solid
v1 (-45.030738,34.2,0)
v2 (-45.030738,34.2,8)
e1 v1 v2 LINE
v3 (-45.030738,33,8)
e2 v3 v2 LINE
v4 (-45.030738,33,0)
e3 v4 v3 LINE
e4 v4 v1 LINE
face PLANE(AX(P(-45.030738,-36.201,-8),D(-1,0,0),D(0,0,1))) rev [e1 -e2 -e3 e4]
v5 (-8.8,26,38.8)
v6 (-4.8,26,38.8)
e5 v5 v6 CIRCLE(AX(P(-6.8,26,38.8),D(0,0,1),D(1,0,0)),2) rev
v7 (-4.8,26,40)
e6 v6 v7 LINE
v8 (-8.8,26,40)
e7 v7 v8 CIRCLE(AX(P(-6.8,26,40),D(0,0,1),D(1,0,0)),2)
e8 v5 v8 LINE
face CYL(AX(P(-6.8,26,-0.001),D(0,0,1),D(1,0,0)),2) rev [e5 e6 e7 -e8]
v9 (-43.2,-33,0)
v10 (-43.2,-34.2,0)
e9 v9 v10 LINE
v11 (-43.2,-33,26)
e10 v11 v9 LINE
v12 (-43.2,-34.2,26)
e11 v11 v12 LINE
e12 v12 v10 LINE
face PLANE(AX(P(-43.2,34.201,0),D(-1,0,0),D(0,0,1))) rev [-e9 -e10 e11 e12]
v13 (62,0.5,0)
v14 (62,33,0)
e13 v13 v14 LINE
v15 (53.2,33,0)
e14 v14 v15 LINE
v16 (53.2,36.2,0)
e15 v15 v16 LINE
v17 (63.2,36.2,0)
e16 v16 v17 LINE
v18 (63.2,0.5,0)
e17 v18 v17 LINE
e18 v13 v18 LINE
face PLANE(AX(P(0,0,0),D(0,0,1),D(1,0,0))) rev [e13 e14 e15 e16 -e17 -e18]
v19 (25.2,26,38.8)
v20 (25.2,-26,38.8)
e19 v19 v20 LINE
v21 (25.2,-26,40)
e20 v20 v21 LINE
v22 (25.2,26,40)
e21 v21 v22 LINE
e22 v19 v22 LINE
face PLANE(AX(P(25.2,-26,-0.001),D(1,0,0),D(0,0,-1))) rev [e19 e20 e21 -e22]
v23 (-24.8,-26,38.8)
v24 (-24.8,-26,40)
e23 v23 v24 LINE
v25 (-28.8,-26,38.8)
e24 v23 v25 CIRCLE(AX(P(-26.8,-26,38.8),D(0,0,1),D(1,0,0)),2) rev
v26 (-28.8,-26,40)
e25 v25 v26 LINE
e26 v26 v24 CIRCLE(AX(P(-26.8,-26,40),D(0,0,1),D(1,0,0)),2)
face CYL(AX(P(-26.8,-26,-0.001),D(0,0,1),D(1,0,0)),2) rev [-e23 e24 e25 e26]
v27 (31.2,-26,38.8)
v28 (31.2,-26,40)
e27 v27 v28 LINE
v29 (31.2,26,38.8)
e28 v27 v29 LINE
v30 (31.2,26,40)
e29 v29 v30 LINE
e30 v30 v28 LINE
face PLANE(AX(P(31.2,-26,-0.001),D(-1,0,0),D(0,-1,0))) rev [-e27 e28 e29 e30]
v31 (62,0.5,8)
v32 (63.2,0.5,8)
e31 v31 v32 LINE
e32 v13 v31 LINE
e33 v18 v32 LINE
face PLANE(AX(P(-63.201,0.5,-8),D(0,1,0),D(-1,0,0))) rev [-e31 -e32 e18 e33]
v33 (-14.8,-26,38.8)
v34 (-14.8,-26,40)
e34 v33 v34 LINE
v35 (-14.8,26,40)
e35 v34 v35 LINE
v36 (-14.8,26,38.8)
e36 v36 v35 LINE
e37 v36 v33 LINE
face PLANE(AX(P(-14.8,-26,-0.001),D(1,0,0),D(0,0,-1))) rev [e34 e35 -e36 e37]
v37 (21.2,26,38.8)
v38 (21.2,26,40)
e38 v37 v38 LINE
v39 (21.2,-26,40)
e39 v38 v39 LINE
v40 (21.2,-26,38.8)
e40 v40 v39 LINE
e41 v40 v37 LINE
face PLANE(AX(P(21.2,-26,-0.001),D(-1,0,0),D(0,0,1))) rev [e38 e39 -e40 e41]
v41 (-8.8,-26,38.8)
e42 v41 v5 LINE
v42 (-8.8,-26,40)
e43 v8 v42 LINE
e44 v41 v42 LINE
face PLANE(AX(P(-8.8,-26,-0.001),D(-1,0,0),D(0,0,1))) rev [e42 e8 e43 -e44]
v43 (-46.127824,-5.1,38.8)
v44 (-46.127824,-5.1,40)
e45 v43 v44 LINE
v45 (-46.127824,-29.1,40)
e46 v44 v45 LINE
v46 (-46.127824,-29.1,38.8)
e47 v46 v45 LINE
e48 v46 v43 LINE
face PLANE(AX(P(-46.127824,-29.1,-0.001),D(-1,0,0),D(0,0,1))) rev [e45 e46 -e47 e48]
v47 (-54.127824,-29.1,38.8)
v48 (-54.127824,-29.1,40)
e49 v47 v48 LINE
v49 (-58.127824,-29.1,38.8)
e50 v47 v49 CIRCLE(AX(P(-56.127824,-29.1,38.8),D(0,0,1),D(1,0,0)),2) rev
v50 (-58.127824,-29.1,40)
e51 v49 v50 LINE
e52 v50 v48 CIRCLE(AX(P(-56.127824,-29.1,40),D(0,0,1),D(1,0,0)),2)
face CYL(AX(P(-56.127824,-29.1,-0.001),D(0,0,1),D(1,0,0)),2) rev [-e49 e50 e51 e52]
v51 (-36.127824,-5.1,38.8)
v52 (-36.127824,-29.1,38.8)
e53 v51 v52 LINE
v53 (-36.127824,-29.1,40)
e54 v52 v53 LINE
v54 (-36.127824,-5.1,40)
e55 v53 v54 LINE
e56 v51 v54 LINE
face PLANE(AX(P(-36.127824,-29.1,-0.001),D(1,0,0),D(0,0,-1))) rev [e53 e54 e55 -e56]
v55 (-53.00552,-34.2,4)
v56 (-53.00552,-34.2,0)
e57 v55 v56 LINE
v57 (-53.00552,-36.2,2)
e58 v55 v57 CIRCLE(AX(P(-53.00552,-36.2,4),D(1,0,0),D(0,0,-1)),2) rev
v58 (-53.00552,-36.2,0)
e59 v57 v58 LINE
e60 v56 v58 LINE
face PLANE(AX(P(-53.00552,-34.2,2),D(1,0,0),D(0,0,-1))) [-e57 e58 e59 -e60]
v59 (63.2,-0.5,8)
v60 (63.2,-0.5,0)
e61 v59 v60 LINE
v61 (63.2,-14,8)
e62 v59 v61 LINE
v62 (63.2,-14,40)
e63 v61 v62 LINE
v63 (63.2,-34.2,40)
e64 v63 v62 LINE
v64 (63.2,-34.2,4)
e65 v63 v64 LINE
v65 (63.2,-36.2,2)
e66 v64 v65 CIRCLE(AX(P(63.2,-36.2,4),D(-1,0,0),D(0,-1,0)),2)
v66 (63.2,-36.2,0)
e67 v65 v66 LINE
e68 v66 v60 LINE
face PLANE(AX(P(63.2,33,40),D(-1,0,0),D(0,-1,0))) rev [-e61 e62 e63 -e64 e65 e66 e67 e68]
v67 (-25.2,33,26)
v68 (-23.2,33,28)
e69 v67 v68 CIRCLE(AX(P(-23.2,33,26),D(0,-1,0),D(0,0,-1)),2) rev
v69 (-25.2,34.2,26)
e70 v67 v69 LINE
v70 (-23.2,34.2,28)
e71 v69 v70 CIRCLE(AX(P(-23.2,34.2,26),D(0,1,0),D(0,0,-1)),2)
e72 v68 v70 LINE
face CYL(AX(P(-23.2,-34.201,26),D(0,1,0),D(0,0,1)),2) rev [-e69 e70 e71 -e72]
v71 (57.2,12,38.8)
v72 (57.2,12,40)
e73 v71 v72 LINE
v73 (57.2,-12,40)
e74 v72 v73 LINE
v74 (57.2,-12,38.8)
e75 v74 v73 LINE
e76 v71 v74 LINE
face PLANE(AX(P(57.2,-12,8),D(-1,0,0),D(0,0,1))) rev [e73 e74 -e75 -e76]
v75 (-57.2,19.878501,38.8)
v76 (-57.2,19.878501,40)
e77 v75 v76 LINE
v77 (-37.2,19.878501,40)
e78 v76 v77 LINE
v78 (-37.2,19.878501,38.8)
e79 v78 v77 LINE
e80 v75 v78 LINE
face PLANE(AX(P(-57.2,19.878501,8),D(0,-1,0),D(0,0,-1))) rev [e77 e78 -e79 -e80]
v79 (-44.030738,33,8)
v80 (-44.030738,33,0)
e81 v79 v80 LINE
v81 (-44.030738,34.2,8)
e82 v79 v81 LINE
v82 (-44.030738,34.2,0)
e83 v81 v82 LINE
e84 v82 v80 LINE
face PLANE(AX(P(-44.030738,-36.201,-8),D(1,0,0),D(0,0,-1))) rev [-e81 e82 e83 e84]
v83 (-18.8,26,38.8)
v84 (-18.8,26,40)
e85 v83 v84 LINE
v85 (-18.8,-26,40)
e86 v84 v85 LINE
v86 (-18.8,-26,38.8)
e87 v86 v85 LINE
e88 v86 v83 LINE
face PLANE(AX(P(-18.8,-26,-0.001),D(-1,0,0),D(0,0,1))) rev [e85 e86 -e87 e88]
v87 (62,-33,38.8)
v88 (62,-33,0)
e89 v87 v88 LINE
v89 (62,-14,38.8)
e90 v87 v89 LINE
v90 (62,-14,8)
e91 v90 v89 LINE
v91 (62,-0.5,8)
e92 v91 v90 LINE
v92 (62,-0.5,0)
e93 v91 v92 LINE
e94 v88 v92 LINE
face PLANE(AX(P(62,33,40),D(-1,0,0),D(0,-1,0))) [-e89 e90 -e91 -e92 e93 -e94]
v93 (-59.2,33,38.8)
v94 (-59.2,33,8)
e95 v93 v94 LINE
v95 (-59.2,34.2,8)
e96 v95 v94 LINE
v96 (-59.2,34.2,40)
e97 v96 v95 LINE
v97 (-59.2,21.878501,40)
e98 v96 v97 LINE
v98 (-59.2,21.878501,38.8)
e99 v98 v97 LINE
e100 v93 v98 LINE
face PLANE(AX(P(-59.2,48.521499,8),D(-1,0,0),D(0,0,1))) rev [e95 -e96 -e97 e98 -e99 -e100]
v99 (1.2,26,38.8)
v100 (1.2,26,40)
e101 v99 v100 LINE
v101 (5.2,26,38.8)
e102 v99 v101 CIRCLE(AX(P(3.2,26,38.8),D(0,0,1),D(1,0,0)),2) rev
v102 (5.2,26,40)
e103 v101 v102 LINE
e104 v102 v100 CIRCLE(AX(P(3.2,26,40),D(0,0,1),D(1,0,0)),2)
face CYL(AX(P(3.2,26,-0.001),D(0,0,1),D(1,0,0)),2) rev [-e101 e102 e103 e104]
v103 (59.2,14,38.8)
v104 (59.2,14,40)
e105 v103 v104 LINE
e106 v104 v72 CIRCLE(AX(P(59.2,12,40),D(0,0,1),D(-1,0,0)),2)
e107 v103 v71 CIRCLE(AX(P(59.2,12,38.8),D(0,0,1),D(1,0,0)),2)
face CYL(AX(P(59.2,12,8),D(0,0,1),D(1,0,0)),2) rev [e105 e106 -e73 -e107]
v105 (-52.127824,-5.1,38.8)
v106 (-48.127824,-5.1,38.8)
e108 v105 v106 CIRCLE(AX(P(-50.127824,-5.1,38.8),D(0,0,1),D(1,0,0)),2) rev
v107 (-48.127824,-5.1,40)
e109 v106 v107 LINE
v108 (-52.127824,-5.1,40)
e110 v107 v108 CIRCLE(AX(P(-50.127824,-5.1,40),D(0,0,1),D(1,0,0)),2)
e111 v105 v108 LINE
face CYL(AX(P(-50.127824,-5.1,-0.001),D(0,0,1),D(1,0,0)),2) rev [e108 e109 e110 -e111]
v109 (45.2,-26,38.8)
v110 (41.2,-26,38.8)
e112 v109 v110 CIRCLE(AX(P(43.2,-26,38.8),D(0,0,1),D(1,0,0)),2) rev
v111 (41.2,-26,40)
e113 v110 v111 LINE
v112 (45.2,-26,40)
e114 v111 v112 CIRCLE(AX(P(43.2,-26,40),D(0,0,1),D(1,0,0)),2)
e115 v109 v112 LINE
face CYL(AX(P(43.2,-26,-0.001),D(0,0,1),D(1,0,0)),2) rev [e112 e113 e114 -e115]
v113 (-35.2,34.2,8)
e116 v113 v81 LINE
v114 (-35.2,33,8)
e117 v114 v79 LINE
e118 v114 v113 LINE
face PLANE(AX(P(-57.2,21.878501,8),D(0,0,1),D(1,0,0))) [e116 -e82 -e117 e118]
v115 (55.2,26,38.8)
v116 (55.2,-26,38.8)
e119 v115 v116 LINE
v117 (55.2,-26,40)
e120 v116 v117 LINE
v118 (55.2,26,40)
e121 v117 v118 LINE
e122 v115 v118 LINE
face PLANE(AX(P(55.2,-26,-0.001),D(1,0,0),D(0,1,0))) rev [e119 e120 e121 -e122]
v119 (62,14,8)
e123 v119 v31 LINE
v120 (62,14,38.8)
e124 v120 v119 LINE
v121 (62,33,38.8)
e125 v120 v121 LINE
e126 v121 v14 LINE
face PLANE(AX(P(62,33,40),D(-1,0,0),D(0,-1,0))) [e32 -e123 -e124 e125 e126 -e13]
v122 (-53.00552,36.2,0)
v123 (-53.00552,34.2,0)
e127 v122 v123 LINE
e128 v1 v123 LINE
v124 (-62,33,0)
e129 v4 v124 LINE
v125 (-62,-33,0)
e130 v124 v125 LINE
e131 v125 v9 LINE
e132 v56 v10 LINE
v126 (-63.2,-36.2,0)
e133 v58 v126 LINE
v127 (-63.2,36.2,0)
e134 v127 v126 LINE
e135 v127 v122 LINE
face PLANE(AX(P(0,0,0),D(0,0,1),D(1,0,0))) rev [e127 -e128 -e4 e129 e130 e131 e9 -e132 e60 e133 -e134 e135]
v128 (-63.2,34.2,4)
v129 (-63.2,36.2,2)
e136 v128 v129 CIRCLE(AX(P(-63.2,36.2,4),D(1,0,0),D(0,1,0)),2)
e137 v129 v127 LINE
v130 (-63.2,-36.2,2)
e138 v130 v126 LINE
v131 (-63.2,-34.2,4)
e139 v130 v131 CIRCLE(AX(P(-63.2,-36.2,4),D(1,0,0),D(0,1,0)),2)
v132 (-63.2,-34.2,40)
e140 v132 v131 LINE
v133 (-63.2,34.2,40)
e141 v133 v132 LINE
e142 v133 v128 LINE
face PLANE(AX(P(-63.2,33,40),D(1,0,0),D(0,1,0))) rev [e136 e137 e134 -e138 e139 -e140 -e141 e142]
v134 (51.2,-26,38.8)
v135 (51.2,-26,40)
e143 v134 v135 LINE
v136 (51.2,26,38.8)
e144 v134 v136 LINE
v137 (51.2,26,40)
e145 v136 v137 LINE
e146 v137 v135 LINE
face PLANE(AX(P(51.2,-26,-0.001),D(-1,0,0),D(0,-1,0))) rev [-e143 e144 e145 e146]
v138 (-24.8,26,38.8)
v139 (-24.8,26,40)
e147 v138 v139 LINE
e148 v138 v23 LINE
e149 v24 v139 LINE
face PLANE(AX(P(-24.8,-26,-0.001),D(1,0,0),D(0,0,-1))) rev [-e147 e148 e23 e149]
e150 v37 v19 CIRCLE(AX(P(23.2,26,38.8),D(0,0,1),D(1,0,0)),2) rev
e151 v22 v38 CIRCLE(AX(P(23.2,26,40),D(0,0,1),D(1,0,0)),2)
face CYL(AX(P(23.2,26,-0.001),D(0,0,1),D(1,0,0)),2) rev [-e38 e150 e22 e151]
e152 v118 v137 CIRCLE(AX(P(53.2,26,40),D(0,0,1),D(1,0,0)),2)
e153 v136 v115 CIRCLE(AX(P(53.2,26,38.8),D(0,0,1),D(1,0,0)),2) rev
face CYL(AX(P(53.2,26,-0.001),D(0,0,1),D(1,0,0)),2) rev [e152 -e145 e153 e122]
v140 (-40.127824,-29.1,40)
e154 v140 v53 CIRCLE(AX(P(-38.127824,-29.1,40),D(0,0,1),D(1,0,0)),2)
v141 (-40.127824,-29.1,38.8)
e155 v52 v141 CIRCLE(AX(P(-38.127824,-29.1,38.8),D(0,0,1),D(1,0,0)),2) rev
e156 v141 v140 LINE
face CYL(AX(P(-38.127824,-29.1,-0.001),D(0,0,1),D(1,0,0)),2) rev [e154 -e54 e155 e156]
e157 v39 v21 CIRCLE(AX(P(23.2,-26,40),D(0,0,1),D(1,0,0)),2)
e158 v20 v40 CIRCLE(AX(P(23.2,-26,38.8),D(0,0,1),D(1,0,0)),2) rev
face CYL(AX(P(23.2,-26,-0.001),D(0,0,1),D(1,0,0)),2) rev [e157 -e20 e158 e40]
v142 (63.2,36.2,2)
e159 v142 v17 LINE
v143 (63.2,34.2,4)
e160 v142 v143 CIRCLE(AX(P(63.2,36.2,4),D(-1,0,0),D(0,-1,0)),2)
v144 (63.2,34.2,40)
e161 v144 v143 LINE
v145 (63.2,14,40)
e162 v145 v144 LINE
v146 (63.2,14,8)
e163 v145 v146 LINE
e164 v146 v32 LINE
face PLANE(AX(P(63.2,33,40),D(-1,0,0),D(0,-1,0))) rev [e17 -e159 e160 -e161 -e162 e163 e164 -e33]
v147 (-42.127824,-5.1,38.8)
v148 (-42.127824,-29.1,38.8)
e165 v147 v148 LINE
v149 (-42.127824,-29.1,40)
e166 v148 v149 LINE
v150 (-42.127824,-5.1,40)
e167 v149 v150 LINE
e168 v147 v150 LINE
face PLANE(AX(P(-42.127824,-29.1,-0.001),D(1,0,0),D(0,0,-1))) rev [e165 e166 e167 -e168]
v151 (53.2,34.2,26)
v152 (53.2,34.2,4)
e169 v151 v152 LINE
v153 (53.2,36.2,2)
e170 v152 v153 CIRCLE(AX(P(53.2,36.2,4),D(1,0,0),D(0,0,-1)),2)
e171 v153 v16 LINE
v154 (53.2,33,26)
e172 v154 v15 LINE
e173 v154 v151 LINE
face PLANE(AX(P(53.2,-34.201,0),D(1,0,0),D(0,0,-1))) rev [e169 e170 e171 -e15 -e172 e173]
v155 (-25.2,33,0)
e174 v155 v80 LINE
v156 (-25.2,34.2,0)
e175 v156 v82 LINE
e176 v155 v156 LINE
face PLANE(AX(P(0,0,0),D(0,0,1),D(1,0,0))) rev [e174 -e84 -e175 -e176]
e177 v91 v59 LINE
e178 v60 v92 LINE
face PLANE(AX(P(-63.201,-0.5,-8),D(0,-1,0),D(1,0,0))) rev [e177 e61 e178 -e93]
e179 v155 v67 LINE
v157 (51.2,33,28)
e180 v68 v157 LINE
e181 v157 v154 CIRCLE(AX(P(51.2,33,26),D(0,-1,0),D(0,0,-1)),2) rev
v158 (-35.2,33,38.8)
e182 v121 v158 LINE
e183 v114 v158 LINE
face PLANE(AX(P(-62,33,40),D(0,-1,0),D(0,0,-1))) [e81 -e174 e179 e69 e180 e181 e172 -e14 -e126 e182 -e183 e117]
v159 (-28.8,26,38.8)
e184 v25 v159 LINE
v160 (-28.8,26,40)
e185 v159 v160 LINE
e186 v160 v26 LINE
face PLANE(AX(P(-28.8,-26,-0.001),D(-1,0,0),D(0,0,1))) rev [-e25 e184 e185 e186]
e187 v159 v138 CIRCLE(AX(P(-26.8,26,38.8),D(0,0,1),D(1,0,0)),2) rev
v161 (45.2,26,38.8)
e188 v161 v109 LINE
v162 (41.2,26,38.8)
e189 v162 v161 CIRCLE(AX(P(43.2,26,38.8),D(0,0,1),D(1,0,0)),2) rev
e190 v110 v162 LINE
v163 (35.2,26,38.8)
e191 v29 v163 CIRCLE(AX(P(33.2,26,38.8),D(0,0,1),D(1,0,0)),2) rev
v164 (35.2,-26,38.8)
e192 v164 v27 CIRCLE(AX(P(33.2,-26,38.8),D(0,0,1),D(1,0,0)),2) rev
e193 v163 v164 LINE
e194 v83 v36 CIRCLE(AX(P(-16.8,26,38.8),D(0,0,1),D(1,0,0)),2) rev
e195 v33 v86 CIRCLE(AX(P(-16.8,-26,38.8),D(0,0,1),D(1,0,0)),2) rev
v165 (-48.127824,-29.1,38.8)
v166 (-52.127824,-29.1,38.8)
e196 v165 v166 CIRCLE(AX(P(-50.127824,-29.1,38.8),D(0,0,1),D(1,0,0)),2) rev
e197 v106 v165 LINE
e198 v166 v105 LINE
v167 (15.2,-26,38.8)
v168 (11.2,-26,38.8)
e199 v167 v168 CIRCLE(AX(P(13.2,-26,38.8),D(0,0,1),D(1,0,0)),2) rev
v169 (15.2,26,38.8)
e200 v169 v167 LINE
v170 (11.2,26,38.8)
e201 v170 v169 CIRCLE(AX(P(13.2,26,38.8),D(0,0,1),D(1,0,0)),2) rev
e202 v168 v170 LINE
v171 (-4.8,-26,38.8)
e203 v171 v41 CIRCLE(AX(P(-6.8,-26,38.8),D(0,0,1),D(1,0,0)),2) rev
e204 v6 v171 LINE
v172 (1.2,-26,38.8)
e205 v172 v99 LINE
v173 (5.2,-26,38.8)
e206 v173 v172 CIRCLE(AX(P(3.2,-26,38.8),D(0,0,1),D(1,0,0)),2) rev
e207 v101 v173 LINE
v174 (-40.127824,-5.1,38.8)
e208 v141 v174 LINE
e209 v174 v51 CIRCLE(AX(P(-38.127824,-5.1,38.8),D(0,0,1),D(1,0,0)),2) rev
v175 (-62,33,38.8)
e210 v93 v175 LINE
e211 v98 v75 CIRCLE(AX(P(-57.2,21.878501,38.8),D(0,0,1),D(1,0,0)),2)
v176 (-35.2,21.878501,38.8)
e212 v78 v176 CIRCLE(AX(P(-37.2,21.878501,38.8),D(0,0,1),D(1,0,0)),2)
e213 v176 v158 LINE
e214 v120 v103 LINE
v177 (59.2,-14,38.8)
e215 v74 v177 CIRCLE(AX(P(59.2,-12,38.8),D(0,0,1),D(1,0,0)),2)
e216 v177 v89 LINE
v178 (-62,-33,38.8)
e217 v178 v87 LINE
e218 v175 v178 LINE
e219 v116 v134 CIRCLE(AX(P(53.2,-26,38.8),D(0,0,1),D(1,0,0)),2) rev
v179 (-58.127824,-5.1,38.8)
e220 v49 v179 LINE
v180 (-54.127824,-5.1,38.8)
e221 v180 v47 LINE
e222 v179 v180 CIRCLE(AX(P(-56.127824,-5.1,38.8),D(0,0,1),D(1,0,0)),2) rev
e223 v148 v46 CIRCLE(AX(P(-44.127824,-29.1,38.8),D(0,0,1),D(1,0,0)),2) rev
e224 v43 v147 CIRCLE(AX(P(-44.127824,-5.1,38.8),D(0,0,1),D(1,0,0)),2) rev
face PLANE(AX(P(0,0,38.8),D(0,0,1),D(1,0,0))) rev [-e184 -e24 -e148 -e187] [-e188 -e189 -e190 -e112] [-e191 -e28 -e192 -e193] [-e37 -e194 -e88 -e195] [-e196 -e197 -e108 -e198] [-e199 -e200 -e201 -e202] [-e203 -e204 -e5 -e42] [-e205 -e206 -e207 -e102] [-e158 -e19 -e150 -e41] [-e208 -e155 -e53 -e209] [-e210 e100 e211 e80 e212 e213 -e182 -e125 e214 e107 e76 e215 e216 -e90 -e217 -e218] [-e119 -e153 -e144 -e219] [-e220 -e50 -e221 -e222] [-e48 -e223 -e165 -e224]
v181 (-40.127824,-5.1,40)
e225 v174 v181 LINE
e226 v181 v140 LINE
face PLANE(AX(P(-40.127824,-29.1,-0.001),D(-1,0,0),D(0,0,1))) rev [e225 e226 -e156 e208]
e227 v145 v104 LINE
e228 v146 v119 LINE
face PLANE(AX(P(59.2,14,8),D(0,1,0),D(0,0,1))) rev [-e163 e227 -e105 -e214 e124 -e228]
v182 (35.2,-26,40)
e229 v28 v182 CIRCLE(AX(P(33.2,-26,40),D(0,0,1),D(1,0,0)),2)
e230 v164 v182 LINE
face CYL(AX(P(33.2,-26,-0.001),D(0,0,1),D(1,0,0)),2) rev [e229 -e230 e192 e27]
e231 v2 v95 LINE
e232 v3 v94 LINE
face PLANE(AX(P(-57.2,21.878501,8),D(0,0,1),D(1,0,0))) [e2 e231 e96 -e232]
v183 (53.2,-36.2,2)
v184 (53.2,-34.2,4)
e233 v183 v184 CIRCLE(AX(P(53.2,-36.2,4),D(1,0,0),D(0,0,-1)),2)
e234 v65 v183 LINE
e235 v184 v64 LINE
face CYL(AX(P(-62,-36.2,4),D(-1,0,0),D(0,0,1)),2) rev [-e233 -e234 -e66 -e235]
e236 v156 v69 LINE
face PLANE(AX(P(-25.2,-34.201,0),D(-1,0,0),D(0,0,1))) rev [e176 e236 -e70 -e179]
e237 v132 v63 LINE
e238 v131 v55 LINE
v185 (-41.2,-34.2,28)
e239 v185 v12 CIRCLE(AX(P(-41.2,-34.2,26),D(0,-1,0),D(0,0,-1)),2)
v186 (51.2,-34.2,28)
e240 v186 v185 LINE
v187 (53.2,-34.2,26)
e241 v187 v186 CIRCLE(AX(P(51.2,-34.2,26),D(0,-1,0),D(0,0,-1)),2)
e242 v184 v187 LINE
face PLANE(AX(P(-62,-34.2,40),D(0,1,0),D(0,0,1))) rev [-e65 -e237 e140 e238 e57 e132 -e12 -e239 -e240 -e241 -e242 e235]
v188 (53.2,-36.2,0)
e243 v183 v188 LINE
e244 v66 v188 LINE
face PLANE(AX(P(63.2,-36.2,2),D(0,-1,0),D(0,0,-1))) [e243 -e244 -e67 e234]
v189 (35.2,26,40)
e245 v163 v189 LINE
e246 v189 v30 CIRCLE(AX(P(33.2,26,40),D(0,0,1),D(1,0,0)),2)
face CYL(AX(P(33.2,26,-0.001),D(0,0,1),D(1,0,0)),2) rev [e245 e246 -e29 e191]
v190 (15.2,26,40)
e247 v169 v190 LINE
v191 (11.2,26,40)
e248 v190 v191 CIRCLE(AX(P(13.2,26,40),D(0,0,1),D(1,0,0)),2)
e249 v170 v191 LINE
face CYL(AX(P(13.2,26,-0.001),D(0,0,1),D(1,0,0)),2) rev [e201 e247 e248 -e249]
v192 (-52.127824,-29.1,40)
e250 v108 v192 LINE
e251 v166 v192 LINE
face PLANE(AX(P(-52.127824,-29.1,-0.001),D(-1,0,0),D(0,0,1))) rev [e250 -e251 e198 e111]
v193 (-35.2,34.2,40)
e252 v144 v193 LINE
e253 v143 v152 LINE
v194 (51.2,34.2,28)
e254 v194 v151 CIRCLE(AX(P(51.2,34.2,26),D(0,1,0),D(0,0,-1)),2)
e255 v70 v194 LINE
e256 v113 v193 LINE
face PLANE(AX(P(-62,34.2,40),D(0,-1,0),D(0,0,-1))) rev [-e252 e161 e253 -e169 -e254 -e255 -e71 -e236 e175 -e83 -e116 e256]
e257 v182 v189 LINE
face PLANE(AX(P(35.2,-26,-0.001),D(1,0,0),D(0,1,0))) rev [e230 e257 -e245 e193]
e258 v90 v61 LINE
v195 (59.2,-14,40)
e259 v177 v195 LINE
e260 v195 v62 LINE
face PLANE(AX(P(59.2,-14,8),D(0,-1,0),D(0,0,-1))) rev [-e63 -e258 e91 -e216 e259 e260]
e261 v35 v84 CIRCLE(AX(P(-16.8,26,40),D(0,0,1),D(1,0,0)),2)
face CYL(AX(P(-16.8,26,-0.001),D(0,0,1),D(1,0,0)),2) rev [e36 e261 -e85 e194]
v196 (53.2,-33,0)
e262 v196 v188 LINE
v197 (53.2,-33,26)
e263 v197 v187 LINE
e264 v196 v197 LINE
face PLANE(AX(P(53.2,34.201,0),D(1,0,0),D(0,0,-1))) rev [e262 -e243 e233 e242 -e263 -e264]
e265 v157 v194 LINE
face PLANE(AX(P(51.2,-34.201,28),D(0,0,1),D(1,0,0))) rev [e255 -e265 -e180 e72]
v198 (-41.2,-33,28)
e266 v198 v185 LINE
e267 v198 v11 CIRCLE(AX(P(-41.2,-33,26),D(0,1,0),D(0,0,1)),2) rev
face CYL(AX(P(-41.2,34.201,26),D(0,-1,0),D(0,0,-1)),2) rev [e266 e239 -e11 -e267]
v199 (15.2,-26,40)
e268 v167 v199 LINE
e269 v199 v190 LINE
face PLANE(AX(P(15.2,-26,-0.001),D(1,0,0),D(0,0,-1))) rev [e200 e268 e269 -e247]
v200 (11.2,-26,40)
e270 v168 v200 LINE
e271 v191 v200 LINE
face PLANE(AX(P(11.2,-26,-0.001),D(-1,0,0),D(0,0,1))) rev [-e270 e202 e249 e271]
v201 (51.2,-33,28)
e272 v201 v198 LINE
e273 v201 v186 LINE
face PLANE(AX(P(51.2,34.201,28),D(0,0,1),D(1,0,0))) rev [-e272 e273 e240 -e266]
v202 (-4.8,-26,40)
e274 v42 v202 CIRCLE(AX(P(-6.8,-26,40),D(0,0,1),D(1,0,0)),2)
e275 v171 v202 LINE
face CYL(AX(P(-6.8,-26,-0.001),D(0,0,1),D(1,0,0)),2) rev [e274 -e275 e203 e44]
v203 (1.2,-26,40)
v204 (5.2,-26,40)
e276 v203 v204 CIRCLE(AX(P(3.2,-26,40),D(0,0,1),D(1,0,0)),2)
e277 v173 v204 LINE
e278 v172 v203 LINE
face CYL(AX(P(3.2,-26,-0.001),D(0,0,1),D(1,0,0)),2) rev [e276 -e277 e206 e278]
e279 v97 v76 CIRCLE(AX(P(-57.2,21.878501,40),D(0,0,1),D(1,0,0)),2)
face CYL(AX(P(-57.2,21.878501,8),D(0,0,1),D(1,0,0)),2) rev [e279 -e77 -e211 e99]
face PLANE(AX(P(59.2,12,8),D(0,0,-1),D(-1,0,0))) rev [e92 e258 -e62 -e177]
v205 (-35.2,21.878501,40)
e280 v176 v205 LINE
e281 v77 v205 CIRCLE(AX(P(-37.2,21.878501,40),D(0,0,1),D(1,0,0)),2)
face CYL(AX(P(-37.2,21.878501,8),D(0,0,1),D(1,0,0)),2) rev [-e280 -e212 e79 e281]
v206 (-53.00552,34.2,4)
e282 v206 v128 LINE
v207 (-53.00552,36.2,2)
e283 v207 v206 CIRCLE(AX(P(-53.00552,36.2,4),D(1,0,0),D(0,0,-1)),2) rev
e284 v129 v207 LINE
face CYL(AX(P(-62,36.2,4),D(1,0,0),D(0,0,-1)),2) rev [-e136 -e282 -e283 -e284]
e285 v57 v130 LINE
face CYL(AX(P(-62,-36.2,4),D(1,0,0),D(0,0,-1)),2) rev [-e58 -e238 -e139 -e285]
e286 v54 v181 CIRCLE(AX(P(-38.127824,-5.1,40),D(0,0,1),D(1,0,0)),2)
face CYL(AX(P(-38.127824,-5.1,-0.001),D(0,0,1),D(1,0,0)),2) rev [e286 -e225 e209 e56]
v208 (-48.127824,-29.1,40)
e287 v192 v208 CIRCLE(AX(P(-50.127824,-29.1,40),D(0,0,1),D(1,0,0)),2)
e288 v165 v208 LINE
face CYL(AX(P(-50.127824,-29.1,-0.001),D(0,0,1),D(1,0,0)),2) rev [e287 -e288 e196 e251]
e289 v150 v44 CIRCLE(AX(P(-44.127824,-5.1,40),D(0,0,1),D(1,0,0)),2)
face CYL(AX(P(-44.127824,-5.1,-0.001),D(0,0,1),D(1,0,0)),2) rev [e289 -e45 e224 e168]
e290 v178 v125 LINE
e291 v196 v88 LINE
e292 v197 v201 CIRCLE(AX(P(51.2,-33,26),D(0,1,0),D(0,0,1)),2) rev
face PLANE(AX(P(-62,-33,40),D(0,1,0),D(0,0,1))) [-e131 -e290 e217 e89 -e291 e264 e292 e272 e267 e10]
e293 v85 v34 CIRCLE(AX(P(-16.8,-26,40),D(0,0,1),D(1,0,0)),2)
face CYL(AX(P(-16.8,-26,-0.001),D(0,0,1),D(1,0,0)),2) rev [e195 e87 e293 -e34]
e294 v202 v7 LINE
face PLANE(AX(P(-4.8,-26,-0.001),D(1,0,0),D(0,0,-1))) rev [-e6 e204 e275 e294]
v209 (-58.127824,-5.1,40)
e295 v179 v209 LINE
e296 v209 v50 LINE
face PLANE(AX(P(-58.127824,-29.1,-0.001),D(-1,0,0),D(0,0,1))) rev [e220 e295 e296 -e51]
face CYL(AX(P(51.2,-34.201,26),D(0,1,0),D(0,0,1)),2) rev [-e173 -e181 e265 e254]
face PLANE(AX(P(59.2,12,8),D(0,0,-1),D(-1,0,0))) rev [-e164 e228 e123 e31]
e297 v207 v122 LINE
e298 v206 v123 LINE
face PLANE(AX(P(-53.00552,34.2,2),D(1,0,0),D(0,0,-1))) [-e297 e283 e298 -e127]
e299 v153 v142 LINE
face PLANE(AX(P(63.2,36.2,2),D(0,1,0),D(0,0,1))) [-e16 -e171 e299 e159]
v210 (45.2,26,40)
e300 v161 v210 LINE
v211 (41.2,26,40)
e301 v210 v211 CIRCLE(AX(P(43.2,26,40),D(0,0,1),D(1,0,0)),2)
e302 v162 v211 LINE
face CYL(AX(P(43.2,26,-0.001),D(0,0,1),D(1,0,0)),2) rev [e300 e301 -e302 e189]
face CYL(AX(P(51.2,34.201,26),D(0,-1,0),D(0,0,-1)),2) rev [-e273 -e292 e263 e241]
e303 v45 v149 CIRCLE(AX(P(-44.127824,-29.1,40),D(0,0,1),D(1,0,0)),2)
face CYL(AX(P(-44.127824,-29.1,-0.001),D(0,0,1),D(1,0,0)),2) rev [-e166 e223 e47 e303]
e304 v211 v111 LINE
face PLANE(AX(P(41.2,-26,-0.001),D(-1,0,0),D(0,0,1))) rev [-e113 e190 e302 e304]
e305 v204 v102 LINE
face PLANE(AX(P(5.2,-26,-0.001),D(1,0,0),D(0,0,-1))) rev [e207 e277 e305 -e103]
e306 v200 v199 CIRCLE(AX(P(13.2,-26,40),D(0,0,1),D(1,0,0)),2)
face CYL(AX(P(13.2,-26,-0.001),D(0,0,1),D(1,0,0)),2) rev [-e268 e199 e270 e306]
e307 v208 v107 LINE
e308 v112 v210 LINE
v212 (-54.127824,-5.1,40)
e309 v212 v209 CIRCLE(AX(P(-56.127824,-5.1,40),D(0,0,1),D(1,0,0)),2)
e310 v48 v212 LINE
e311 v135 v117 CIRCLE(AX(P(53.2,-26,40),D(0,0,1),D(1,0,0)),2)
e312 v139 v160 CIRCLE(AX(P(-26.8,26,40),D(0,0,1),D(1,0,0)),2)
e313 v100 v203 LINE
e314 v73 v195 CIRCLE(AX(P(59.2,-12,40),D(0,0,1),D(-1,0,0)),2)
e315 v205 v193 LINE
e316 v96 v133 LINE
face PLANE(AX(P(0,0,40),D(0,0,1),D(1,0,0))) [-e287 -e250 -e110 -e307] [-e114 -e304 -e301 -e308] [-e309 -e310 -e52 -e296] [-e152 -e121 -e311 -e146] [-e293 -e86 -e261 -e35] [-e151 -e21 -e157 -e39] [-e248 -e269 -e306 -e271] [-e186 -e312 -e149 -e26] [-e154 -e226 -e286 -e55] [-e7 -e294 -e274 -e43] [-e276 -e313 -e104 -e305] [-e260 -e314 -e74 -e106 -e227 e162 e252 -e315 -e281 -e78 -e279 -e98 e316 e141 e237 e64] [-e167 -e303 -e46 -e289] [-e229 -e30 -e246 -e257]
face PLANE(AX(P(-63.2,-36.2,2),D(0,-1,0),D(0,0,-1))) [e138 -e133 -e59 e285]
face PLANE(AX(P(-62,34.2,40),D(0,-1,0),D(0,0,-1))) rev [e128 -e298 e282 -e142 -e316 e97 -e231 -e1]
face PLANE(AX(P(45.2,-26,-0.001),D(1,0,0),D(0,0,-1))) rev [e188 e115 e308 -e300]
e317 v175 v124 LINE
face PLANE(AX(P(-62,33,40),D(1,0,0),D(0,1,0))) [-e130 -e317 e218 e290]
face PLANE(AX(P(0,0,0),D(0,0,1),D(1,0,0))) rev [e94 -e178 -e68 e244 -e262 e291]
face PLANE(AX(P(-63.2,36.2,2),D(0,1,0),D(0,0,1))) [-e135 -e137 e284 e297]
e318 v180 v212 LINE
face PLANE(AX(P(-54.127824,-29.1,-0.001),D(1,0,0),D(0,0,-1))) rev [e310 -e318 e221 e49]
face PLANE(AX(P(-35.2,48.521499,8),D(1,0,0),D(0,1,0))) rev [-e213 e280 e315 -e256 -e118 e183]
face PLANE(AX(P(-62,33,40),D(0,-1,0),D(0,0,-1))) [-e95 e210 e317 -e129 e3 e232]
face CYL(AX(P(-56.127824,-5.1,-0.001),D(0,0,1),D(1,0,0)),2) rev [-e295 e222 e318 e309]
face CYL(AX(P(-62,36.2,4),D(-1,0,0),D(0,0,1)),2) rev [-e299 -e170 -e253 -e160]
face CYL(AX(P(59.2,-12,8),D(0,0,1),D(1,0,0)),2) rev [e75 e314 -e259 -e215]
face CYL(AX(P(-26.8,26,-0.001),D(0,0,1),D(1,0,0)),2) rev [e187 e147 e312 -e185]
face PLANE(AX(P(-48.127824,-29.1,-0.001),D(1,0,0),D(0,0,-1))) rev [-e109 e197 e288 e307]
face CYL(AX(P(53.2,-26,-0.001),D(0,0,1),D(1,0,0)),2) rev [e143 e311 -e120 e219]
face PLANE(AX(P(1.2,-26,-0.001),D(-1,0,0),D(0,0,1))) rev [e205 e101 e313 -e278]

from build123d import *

# Parameters (mm, degrees)
SKETCH_1_W          = 126.4
SKETCH_1_H          = 68.4
SKETCH_1_W_2        = 124
SKETCH_1_H_2        = 66
EXTRUDE_1_DEPTH     = 40
SKETCH_2_W          = 126.4
SKETCH_2_H          = 68.4
EXTRUDE_1_2_DEPTH   = 1.2
CUT_EXTRUDE_1_DEPTH = 32
CUT_EXTRUDE_2_REACH = 84.243
CUT_EXTRUDE_3_DEPTH = 32
CUT_EXTRUDE_4_REACH = 103.355
CUT_EXTRUDE_5_REACH = 103.355
SKETCH_8_W          = 10
SKETCH_8_H          = 2
SKETCH_8_W_2        = 10.194480457
EXTRUDE_2_DEPTH     = 2
FILLET_1_R          = 2
CUT_EXTRUDE_6_REACH = 139.431
SKETCH_9_W          = 16
SKETCH_9_H          = 1
CUT_EXTRUDE_7_REACH = 104.715
SKETCH_10_W         = 1
SKETCH_10_H         = 16


with BuildPart() as part:
    # Эскиз1 → Extrude 1 (new body)
    with BuildSketch(Plane.XY):
        Rectangle(SKETCH_1_W, SKETCH_1_H)
        Rectangle(SKETCH_1_W_2, SKETCH_1_H_2, mode=Mode.SUBTRACT)
    extrude(amount=EXTRUDE_1_DEPTH)

    # Эскиз2 → Extrude 1 2 (add)
    with BuildSketch(Plane.XY.offset(40)):
        Rectangle(SKETCH_2_W, SKETCH_2_H)
    extrude(amount=-EXTRUDE_1_2_DEPTH)

    # Эскиз3 → Вырез-Вытянуть1 (cut)
    with BuildSketch(Plane.XY.offset(40)):
        with BuildLine():
            Line((59.2, -14), (69.2, -14))
            Line((69.2, -14), (69.2, 14))
            Line((69.2, 14), (59.2, 14))
            ThreePointArc((59.2, 14), (57.785786438, 13.414213562), (57.2, 12))
            Line((57.2, 12), (57.2, -12))
            ThreePointArc((57.2, -12), (57.785786438, -13.414213562), (59.2, -14))
        make_face()
    extrude(amount=-CUT_EXTRUDE_1_DEPTH, mode=Mode.SUBTRACT)

    # Эскиз4 → Вырез-Вытянуть2 (cut, up to next)
    with BuildSketch(Plane.XY.offset(40), mode=Mode.PRIVATE) as cut_extrude_2_sk1:
        with BuildLine():
            Line((51.2, -26), (51.2, 26))
            ThreePointArc((51.2, 26), (53.2, 28), (55.2, 26))
            Line((55.2, 26), (55.2, -26))
            ThreePointArc((55.2, -26), (53.2, -28), (51.2, -26))
        make_face()
    cut_extrude_2_tool1 = extrude(cut_extrude_2_sk1.sketch, amount=-CUT_EXTRUDE_2_REACH, mode=Mode.PRIVATE) & part.part
    # Эскиз4 → Вырез-Вытянуть2 (cut, up to next)
    with BuildSketch(Plane.XY.offset(40), mode=Mode.PRIVATE) as cut_extrude_2_sk2:
        with BuildLine():
            Line((41.2, -26), (41.2, 26))
            ThreePointArc((41.2, 26), (43.2, 28), (45.2, 26))
            Line((45.2, 26), (45.2, -26))
            ThreePointArc((45.2, -26), (43.2, -28), (41.2, -26))
        make_face()
    cut_extrude_2_tool2 = extrude(cut_extrude_2_sk2.sketch, amount=-CUT_EXTRUDE_2_REACH, mode=Mode.PRIVATE) & part.part
    # Эскиз4 → Вырез-Вытянуть2 (cut, up to next)
    with BuildSketch(Plane.XY.offset(40), mode=Mode.PRIVATE) as cut_extrude_2_sk3:
        with BuildLine():
            Line((31.2, -26), (31.2, 26))
            ThreePointArc((31.2, 26), (33.2, 28), (35.2, 26))
            Line((35.2, 26), (35.2, -26))
            ThreePointArc((35.2, -26), (33.2, -28), (31.2, -26))
        make_face()
    cut_extrude_2_tool3 = extrude(cut_extrude_2_sk3.sketch, amount=-CUT_EXTRUDE_2_REACH, mode=Mode.PRIVATE) & part.part
    # Эскиз4 → Вырез-Вытянуть2 (cut, up to next)
    with BuildSketch(Plane.XY.offset(40), mode=Mode.PRIVATE) as cut_extrude_2_sk4:
        with BuildLine():
            Line((21.2, -26), (21.2, 26))
            ThreePointArc((21.2, 26), (23.2, 28), (25.2, 26))
            Line((25.2, 26), (25.2, -26))
            ThreePointArc((25.2, -26), (23.2, -28), (21.2, -26))
        make_face()
    cut_extrude_2_tool4 = extrude(cut_extrude_2_sk4.sketch, amount=-CUT_EXTRUDE_2_REACH, mode=Mode.PRIVATE) & part.part
    # Эскиз4 → Вырез-Вытянуть2 (cut, up to next)
    with BuildSketch(Plane.XY.offset(40), mode=Mode.PRIVATE) as cut_extrude_2_sk5:
        with BuildLine():
            Line((11.2, -26), (11.2, 26))
            ThreePointArc((11.2, 26), (13.2, 28), (15.2, 26))
            Line((15.2, 26), (15.2, -26))
            ThreePointArc((15.2, -26), (13.2, -28), (11.2, -26))
        make_face()
    cut_extrude_2_tool5 = extrude(cut_extrude_2_sk5.sketch, amount=-CUT_EXTRUDE_2_REACH, mode=Mode.PRIVATE) & part.part
    # Эскиз4 → Вырез-Вытянуть2 (cut, up to next)
    with BuildSketch(Plane.XY.offset(40), mode=Mode.PRIVATE) as cut_extrude_2_sk6:
        with BuildLine():
            Line((1.2, -26), (1.2, 26))
            ThreePointArc((1.2, 26), (3.2, 28), (5.2, 26))
            Line((5.2, 26), (5.2, -26))
            ThreePointArc((5.2, -26), (3.2, -28), (1.2, -26))
        make_face()
    cut_extrude_2_tool6 = extrude(cut_extrude_2_sk6.sketch, amount=-CUT_EXTRUDE_2_REACH, mode=Mode.PRIVATE) & part.part
    # Эскиз4 → Вырез-Вытянуть2 (cut, up to next)
    with BuildSketch(Plane.XY.offset(40), mode=Mode.PRIVATE) as cut_extrude_2_sk7:
        with BuildLine():
            Line((-8.8, -26), (-8.8, 26))
            ThreePointArc((-8.8, 26), (-6.8, 28), (-4.8, 26))
            Line((-4.8, 26), (-4.8, -26))
            ThreePointArc((-4.8, -26), (-6.8, -28), (-8.8, -26))
        make_face()
    cut_extrude_2_tool7 = extrude(cut_extrude_2_sk7.sketch, amount=-CUT_EXTRUDE_2_REACH, mode=Mode.PRIVATE) & part.part
    # Эскиз4 → Вырез-Вытянуть2 (cut, up to next)
    with BuildSketch(Plane.XY.offset(40), mode=Mode.PRIVATE) as cut_extrude_2_sk8:
        with BuildLine():
            Line((-18.8, -26), (-18.8, 26))
            ThreePointArc((-18.8, 26), (-16.8, 28), (-14.8, 26))
            Line((-14.8, 26), (-14.8, -26))
            ThreePointArc((-14.8, -26), (-16.8, -28), (-18.8, -26))
        make_face()
    cut_extrude_2_tool8 = extrude(cut_extrude_2_sk8.sketch, amount=-CUT_EXTRUDE_2_REACH, mode=Mode.PRIVATE) & part.part
    # Эскиз4 → Вырез-Вытянуть2 (cut, up to next)
    with BuildSketch(Plane.XY.offset(40), mode=Mode.PRIVATE) as cut_extrude_2_sk9:
        with BuildLine():
            Line((-28.8, -26), (-28.8, 26))
            ThreePointArc((-28.8, 26), (-26.8, 28), (-24.8, 26))
            Line((-24.8, 26), (-24.8, -26))
            ThreePointArc((-24.8, -26), (-26.8, -28), (-28.8, -26))
        make_face()
    cut_extrude_2_tool9 = extrude(cut_extrude_2_sk9.sketch, amount=-CUT_EXTRUDE_2_REACH, mode=Mode.PRIVATE) & part.part
    # Эскиз4 → Вырез-Вытянуть2 (cut, up to next)
    with BuildSketch(Plane.XY.offset(40), mode=Mode.PRIVATE) as cut_extrude_2_sk10:
        with BuildLine():
            Line((-40.127823637, -29.1), (-40.127823637, -5.1))
            ThreePointArc((-40.127823637, -5.1), (-38.127823637, -3.1), (-36.127823637, -5.1))
            Line((-36.127823637, -5.1), (-36.127823637, -29.1))
            ThreePointArc((-36.127823637, -29.1), (-38.127823637, -31.1), (-40.127823637, -29.1))
        make_face()
    cut_extrude_2_tool10 = extrude(cut_extrude_2_sk10.sketch, amount=-CUT_EXTRUDE_2_REACH, mode=Mode.PRIVATE) & part.part
    # Эскиз4 → Вырез-Вытянуть2 (cut, up to next)
    with BuildSketch(Plane.XY.offset(40), mode=Mode.PRIVATE) as cut_extrude_2_sk11:
        with BuildLine():
            Line((-46.127823637, -29.1), (-46.127823637, -5.1))
            ThreePointArc((-46.127823637, -5.1), (-44.127823637, -3.1), (-42.127823637, -5.1))
            Line((-42.127823637, -5.1), (-42.127823637, -29.1))
            ThreePointArc((-42.127823637, -29.1), (-44.127823637, -31.1), (-46.127823637, -29.1))
        make_face()
    cut_extrude_2_tool11 = extrude(cut_extrude_2_sk11.sketch, amount=-CUT_EXTRUDE_2_REACH, mode=Mode.PRIVATE) & part.part
    # Эскиз4 → Вырез-Вытянуть2 (cut, up to next)
    with BuildSketch(Plane.XY.offset(40), mode=Mode.PRIVATE) as cut_extrude_2_sk12:
        with BuildLine():
            Line((-52.127823637, -29.1), (-52.127823637, -5.1))
            ThreePointArc((-52.127823637, -5.1), (-50.127823637, -3.1), (-48.127823637, -5.1))
            Line((-48.127823637, -5.1), (-48.127823637, -29.1))
            ThreePointArc((-48.127823637, -29.1), (-50.127823637, -31.1), (-52.127823637, -29.1))
        make_face()
    cut_extrude_2_tool12 = extrude(cut_extrude_2_sk12.sketch, amount=-CUT_EXTRUDE_2_REACH, mode=Mode.PRIVATE) & part.part
    # Эскиз4 → Вырез-Вытянуть2 (cut, up to next)
    with BuildSketch(Plane.XY.offset(40), mode=Mode.PRIVATE) as cut_extrude_2_sk13:
        with BuildLine():
            Line((-58.127823637, -29.1), (-58.127823637, -5.1))
            ThreePointArc((-58.127823637, -5.1), (-56.127823637, -3.1), (-54.127823637, -5.1))
            Line((-54.127823637, -5.1), (-54.127823637, -29.1))
            ThreePointArc((-54.127823637, -29.1), (-56.127823637, -31.1), (-58.127823637, -29.1))
        make_face()
    cut_extrude_2_tool13 = extrude(cut_extrude_2_sk13.sketch, amount=-CUT_EXTRUDE_2_REACH, mode=Mode.PRIVATE) & part.part
    add(cut_extrude_2_tool1.solids().sort_by_distance((53.2, 0, 40))[0], mode=Mode.SUBTRACT)
    add(cut_extrude_2_tool2.solids().sort_by_distance((43.2, 0, 40))[0], mode=Mode.SUBTRACT)
    add(cut_extrude_2_tool3.solids().sort_by_distance((33.2, 0, 40))[0], mode=Mode.SUBTRACT)
    add(cut_extrude_2_tool4.solids().sort_by_distance((23.2, 0, 40))[0], mode=Mode.SUBTRACT)
    add(cut_extrude_2_tool5.solids().sort_by_distance((13.2, 0, 40))[0], mode=Mode.SUBTRACT)
    add(cut_extrude_2_tool6.solids().sort_by_distance((3.2, 0, 40))[0], mode=Mode.SUBTRACT)
    add(cut_extrude_2_tool7.solids().sort_by_distance((-6.8, 0, 40))[0], mode=Mode.SUBTRACT)
    add(cut_extrude_2_tool8.solids().sort_by_distance((-16.8, 0, 40))[0], mode=Mode.SUBTRACT)
    add(cut_extrude_2_tool9.solids().sort_by_distance((-26.8, 0, 40))[0], mode=Mode.SUBTRACT)
    add(cut_extrude_2_tool10.solids().sort_by_distance((-38.127824, -17.1, 40))[0], mode=Mode.SUBTRACT)
    add(cut_extrude_2_tool11.solids().sort_by_distance((-44.127824, -17.1, 40))[0], mode=Mode.SUBTRACT)
    add(cut_extrude_2_tool12.solids().sort_by_distance((-50.127824, -17.1, 40))[0], mode=Mode.SUBTRACT)
    add(cut_extrude_2_tool13.solids().sort_by_distance((-56.127824, -17.1, 40))[0], mode=Mode.SUBTRACT)

    # Эскиз5 → Вырез-Вытянуть3 (cut)
    with BuildSketch(Plane.XY.offset(40)):
        with BuildLine():
            Line((-59.2, 48.521499027), (-35.2, 48.521499027))
            Line((-35.2, 48.521499027), (-35.2, 21.878500973))
            ThreePointArc((-35.2, 21.878500973), (-35.785786438, 20.46428741), (-37.2, 19.878500973))
            Line((-37.2, 19.878500973), (-57.2, 19.878500973))
            ThreePointArc((-57.2, 19.878500973), (-58.614213562, 20.46428741), (-59.2, 21.878500973))
            Line((-59.2, 21.878500973), (-59.2, 48.521499027))
        make_face()
    extrude(amount=-CUT_EXTRUDE_3_DEPTH, mode=Mode.SUBTRACT)

    # Эскиз6 → Вырез-Вытянуть4 (cut, up to next)
    with BuildSketch(Plane.XZ.offset(34.2), mode=Mode.PRIVATE) as cut_extrude_4_sk1:
        with BuildLine():
            Line((53.2, 0), (-43.2, 0))
            Line((-43.2, 0), (-43.2, 26))
            ThreePointArc((-43.2, 26), (-42.614213562, 27.414213562), (-41.2, 28))
            Line((-41.2, 28), (51.2, 28))
            ThreePointArc((51.2, 28), (52.614213562, 27.414213562), (53.2, 26))
            Line((53.2, 26), (53.2, 0))
        make_face()
    cut_extrude_4_tool1 = extrude(cut_extrude_4_sk1.sketch, amount=-CUT_EXTRUDE_4_REACH, mode=Mode.PRIVATE) & part.part
    add(cut_extrude_4_tool1.solids().sort_by_distance((5, -34.2, 13.991374))[0], mode=Mode.SUBTRACT)

    # Эскиз7 → Вырез-Вытянуть5 (cut, up to next)
    with BuildSketch(Plane(origin=(0, 34.2, 0), x_dir=(1, 0, 0), z_dir=(0, 1, 0)), mode=Mode.PRIVATE) as cut_extrude_5_sk1:
        with BuildLine():
            Line((53.2, 0), (-25.2, 0))
            Line((-25.2, 0), (-25.2, -26))
            ThreePointArc((-25.2, -26), (-24.614213562, -27.414213562), (-23.2, -28))
            Line((-23.2, -28), (51.2, -28))
            ThreePointArc((51.2, -28), (52.614213562, -27.414213562), (53.2, -26))
            Line((53.2, -26), (53.2, 0))
        make_face()
    cut_extrude_5_tool1 = extrude(cut_extrude_5_sk1.sketch, amount=-CUT_EXTRUDE_5_REACH, mode=Mode.PRIVATE) & part.part
    add(cut_extrude_5_tool1.solids().sort_by_distance((14, 34.2, 13.989392))[0], mode=Mode.SUBTRACT)

    # Эскиз8 → Бобышка-Вытянуть2 (add)
    with BuildSketch(Plane(origin=(0, 0, 0), x_dir=(-1, 0, 0), z_dir=(0, 0, -1))):
        with Locations((-58.2, 35.2)):
            Rectangle(SKETCH_8_W, SKETCH_8_H)
        with Locations((-58.2, -35.2)):
            Rectangle(SKETCH_8_W, SKETCH_8_H)
        with Locations((58.102759772, 35.2)):
            Rectangle(SKETCH_8_W_2, SKETCH_8_H)
        with Locations((58.102759772, -35.2)):
            Rectangle(SKETCH_8_W_2, SKETCH_8_H)
    extrude(amount=-EXTRUDE_2_DEPTH)

    # Скругление1
    fillet_1_edges = [part.edges().sort_by_distance(p)[0] for p in [
        (-58.102759771, -34.2, 2),
        (58.2, -34.2, 2),
        (58.2, 34.2, 2),
        (-58.102759771, 34.2, 2),
    ]]
    fillet(fillet_1_edges, radius=FILLET_1_R - 0.0001)  # a hair under: the kernel refuses the full size

    # Эскиз9 → Вырез-Вытянуть6 (cut, up to next)
    with BuildSketch(Plane(origin=(63.2, 0, 0), x_dir=(0, 0, -1), z_dir=(1, 0, 0)), mode=Mode.PRIVATE) as cut_extrude_6_sk1:
        Rectangle(SKETCH_9_W, SKETCH_9_H)
    cut_extrude_6_tool1 = extrude(cut_extrude_6_sk1.sketch, amount=-CUT_EXTRUDE_6_REACH, mode=Mode.PRIVATE) & part.part
    add(cut_extrude_6_tool1.solids().sort_by_distance((63.2, 0, 0))[0], mode=Mode.SUBTRACT)

    # Эскиз10 → Вырез-Вытянуть7 (cut, up to next)
    with BuildSketch(Plane(origin=(0, 34.2, 0), x_dir=(1, 0, 0), z_dir=(0, 1, 0)), mode=Mode.PRIVATE) as cut_extrude_7_sk1:
        with Locations((-44.530737739, 0)):
            Rectangle(SKETCH_10_W, SKETCH_10_H)
    cut_extrude_7_tool1 = extrude(cut_extrude_7_sk1.sketch, amount=-CUT_EXTRUDE_7_REACH, mode=Mode.PRIVATE) & part.part
    add(cut_extrude_7_tool1.solids().sort_by_distance((-44.530738, 34.2, 0))[0], mode=Mode.SUBTRACT)


solid = part.part
